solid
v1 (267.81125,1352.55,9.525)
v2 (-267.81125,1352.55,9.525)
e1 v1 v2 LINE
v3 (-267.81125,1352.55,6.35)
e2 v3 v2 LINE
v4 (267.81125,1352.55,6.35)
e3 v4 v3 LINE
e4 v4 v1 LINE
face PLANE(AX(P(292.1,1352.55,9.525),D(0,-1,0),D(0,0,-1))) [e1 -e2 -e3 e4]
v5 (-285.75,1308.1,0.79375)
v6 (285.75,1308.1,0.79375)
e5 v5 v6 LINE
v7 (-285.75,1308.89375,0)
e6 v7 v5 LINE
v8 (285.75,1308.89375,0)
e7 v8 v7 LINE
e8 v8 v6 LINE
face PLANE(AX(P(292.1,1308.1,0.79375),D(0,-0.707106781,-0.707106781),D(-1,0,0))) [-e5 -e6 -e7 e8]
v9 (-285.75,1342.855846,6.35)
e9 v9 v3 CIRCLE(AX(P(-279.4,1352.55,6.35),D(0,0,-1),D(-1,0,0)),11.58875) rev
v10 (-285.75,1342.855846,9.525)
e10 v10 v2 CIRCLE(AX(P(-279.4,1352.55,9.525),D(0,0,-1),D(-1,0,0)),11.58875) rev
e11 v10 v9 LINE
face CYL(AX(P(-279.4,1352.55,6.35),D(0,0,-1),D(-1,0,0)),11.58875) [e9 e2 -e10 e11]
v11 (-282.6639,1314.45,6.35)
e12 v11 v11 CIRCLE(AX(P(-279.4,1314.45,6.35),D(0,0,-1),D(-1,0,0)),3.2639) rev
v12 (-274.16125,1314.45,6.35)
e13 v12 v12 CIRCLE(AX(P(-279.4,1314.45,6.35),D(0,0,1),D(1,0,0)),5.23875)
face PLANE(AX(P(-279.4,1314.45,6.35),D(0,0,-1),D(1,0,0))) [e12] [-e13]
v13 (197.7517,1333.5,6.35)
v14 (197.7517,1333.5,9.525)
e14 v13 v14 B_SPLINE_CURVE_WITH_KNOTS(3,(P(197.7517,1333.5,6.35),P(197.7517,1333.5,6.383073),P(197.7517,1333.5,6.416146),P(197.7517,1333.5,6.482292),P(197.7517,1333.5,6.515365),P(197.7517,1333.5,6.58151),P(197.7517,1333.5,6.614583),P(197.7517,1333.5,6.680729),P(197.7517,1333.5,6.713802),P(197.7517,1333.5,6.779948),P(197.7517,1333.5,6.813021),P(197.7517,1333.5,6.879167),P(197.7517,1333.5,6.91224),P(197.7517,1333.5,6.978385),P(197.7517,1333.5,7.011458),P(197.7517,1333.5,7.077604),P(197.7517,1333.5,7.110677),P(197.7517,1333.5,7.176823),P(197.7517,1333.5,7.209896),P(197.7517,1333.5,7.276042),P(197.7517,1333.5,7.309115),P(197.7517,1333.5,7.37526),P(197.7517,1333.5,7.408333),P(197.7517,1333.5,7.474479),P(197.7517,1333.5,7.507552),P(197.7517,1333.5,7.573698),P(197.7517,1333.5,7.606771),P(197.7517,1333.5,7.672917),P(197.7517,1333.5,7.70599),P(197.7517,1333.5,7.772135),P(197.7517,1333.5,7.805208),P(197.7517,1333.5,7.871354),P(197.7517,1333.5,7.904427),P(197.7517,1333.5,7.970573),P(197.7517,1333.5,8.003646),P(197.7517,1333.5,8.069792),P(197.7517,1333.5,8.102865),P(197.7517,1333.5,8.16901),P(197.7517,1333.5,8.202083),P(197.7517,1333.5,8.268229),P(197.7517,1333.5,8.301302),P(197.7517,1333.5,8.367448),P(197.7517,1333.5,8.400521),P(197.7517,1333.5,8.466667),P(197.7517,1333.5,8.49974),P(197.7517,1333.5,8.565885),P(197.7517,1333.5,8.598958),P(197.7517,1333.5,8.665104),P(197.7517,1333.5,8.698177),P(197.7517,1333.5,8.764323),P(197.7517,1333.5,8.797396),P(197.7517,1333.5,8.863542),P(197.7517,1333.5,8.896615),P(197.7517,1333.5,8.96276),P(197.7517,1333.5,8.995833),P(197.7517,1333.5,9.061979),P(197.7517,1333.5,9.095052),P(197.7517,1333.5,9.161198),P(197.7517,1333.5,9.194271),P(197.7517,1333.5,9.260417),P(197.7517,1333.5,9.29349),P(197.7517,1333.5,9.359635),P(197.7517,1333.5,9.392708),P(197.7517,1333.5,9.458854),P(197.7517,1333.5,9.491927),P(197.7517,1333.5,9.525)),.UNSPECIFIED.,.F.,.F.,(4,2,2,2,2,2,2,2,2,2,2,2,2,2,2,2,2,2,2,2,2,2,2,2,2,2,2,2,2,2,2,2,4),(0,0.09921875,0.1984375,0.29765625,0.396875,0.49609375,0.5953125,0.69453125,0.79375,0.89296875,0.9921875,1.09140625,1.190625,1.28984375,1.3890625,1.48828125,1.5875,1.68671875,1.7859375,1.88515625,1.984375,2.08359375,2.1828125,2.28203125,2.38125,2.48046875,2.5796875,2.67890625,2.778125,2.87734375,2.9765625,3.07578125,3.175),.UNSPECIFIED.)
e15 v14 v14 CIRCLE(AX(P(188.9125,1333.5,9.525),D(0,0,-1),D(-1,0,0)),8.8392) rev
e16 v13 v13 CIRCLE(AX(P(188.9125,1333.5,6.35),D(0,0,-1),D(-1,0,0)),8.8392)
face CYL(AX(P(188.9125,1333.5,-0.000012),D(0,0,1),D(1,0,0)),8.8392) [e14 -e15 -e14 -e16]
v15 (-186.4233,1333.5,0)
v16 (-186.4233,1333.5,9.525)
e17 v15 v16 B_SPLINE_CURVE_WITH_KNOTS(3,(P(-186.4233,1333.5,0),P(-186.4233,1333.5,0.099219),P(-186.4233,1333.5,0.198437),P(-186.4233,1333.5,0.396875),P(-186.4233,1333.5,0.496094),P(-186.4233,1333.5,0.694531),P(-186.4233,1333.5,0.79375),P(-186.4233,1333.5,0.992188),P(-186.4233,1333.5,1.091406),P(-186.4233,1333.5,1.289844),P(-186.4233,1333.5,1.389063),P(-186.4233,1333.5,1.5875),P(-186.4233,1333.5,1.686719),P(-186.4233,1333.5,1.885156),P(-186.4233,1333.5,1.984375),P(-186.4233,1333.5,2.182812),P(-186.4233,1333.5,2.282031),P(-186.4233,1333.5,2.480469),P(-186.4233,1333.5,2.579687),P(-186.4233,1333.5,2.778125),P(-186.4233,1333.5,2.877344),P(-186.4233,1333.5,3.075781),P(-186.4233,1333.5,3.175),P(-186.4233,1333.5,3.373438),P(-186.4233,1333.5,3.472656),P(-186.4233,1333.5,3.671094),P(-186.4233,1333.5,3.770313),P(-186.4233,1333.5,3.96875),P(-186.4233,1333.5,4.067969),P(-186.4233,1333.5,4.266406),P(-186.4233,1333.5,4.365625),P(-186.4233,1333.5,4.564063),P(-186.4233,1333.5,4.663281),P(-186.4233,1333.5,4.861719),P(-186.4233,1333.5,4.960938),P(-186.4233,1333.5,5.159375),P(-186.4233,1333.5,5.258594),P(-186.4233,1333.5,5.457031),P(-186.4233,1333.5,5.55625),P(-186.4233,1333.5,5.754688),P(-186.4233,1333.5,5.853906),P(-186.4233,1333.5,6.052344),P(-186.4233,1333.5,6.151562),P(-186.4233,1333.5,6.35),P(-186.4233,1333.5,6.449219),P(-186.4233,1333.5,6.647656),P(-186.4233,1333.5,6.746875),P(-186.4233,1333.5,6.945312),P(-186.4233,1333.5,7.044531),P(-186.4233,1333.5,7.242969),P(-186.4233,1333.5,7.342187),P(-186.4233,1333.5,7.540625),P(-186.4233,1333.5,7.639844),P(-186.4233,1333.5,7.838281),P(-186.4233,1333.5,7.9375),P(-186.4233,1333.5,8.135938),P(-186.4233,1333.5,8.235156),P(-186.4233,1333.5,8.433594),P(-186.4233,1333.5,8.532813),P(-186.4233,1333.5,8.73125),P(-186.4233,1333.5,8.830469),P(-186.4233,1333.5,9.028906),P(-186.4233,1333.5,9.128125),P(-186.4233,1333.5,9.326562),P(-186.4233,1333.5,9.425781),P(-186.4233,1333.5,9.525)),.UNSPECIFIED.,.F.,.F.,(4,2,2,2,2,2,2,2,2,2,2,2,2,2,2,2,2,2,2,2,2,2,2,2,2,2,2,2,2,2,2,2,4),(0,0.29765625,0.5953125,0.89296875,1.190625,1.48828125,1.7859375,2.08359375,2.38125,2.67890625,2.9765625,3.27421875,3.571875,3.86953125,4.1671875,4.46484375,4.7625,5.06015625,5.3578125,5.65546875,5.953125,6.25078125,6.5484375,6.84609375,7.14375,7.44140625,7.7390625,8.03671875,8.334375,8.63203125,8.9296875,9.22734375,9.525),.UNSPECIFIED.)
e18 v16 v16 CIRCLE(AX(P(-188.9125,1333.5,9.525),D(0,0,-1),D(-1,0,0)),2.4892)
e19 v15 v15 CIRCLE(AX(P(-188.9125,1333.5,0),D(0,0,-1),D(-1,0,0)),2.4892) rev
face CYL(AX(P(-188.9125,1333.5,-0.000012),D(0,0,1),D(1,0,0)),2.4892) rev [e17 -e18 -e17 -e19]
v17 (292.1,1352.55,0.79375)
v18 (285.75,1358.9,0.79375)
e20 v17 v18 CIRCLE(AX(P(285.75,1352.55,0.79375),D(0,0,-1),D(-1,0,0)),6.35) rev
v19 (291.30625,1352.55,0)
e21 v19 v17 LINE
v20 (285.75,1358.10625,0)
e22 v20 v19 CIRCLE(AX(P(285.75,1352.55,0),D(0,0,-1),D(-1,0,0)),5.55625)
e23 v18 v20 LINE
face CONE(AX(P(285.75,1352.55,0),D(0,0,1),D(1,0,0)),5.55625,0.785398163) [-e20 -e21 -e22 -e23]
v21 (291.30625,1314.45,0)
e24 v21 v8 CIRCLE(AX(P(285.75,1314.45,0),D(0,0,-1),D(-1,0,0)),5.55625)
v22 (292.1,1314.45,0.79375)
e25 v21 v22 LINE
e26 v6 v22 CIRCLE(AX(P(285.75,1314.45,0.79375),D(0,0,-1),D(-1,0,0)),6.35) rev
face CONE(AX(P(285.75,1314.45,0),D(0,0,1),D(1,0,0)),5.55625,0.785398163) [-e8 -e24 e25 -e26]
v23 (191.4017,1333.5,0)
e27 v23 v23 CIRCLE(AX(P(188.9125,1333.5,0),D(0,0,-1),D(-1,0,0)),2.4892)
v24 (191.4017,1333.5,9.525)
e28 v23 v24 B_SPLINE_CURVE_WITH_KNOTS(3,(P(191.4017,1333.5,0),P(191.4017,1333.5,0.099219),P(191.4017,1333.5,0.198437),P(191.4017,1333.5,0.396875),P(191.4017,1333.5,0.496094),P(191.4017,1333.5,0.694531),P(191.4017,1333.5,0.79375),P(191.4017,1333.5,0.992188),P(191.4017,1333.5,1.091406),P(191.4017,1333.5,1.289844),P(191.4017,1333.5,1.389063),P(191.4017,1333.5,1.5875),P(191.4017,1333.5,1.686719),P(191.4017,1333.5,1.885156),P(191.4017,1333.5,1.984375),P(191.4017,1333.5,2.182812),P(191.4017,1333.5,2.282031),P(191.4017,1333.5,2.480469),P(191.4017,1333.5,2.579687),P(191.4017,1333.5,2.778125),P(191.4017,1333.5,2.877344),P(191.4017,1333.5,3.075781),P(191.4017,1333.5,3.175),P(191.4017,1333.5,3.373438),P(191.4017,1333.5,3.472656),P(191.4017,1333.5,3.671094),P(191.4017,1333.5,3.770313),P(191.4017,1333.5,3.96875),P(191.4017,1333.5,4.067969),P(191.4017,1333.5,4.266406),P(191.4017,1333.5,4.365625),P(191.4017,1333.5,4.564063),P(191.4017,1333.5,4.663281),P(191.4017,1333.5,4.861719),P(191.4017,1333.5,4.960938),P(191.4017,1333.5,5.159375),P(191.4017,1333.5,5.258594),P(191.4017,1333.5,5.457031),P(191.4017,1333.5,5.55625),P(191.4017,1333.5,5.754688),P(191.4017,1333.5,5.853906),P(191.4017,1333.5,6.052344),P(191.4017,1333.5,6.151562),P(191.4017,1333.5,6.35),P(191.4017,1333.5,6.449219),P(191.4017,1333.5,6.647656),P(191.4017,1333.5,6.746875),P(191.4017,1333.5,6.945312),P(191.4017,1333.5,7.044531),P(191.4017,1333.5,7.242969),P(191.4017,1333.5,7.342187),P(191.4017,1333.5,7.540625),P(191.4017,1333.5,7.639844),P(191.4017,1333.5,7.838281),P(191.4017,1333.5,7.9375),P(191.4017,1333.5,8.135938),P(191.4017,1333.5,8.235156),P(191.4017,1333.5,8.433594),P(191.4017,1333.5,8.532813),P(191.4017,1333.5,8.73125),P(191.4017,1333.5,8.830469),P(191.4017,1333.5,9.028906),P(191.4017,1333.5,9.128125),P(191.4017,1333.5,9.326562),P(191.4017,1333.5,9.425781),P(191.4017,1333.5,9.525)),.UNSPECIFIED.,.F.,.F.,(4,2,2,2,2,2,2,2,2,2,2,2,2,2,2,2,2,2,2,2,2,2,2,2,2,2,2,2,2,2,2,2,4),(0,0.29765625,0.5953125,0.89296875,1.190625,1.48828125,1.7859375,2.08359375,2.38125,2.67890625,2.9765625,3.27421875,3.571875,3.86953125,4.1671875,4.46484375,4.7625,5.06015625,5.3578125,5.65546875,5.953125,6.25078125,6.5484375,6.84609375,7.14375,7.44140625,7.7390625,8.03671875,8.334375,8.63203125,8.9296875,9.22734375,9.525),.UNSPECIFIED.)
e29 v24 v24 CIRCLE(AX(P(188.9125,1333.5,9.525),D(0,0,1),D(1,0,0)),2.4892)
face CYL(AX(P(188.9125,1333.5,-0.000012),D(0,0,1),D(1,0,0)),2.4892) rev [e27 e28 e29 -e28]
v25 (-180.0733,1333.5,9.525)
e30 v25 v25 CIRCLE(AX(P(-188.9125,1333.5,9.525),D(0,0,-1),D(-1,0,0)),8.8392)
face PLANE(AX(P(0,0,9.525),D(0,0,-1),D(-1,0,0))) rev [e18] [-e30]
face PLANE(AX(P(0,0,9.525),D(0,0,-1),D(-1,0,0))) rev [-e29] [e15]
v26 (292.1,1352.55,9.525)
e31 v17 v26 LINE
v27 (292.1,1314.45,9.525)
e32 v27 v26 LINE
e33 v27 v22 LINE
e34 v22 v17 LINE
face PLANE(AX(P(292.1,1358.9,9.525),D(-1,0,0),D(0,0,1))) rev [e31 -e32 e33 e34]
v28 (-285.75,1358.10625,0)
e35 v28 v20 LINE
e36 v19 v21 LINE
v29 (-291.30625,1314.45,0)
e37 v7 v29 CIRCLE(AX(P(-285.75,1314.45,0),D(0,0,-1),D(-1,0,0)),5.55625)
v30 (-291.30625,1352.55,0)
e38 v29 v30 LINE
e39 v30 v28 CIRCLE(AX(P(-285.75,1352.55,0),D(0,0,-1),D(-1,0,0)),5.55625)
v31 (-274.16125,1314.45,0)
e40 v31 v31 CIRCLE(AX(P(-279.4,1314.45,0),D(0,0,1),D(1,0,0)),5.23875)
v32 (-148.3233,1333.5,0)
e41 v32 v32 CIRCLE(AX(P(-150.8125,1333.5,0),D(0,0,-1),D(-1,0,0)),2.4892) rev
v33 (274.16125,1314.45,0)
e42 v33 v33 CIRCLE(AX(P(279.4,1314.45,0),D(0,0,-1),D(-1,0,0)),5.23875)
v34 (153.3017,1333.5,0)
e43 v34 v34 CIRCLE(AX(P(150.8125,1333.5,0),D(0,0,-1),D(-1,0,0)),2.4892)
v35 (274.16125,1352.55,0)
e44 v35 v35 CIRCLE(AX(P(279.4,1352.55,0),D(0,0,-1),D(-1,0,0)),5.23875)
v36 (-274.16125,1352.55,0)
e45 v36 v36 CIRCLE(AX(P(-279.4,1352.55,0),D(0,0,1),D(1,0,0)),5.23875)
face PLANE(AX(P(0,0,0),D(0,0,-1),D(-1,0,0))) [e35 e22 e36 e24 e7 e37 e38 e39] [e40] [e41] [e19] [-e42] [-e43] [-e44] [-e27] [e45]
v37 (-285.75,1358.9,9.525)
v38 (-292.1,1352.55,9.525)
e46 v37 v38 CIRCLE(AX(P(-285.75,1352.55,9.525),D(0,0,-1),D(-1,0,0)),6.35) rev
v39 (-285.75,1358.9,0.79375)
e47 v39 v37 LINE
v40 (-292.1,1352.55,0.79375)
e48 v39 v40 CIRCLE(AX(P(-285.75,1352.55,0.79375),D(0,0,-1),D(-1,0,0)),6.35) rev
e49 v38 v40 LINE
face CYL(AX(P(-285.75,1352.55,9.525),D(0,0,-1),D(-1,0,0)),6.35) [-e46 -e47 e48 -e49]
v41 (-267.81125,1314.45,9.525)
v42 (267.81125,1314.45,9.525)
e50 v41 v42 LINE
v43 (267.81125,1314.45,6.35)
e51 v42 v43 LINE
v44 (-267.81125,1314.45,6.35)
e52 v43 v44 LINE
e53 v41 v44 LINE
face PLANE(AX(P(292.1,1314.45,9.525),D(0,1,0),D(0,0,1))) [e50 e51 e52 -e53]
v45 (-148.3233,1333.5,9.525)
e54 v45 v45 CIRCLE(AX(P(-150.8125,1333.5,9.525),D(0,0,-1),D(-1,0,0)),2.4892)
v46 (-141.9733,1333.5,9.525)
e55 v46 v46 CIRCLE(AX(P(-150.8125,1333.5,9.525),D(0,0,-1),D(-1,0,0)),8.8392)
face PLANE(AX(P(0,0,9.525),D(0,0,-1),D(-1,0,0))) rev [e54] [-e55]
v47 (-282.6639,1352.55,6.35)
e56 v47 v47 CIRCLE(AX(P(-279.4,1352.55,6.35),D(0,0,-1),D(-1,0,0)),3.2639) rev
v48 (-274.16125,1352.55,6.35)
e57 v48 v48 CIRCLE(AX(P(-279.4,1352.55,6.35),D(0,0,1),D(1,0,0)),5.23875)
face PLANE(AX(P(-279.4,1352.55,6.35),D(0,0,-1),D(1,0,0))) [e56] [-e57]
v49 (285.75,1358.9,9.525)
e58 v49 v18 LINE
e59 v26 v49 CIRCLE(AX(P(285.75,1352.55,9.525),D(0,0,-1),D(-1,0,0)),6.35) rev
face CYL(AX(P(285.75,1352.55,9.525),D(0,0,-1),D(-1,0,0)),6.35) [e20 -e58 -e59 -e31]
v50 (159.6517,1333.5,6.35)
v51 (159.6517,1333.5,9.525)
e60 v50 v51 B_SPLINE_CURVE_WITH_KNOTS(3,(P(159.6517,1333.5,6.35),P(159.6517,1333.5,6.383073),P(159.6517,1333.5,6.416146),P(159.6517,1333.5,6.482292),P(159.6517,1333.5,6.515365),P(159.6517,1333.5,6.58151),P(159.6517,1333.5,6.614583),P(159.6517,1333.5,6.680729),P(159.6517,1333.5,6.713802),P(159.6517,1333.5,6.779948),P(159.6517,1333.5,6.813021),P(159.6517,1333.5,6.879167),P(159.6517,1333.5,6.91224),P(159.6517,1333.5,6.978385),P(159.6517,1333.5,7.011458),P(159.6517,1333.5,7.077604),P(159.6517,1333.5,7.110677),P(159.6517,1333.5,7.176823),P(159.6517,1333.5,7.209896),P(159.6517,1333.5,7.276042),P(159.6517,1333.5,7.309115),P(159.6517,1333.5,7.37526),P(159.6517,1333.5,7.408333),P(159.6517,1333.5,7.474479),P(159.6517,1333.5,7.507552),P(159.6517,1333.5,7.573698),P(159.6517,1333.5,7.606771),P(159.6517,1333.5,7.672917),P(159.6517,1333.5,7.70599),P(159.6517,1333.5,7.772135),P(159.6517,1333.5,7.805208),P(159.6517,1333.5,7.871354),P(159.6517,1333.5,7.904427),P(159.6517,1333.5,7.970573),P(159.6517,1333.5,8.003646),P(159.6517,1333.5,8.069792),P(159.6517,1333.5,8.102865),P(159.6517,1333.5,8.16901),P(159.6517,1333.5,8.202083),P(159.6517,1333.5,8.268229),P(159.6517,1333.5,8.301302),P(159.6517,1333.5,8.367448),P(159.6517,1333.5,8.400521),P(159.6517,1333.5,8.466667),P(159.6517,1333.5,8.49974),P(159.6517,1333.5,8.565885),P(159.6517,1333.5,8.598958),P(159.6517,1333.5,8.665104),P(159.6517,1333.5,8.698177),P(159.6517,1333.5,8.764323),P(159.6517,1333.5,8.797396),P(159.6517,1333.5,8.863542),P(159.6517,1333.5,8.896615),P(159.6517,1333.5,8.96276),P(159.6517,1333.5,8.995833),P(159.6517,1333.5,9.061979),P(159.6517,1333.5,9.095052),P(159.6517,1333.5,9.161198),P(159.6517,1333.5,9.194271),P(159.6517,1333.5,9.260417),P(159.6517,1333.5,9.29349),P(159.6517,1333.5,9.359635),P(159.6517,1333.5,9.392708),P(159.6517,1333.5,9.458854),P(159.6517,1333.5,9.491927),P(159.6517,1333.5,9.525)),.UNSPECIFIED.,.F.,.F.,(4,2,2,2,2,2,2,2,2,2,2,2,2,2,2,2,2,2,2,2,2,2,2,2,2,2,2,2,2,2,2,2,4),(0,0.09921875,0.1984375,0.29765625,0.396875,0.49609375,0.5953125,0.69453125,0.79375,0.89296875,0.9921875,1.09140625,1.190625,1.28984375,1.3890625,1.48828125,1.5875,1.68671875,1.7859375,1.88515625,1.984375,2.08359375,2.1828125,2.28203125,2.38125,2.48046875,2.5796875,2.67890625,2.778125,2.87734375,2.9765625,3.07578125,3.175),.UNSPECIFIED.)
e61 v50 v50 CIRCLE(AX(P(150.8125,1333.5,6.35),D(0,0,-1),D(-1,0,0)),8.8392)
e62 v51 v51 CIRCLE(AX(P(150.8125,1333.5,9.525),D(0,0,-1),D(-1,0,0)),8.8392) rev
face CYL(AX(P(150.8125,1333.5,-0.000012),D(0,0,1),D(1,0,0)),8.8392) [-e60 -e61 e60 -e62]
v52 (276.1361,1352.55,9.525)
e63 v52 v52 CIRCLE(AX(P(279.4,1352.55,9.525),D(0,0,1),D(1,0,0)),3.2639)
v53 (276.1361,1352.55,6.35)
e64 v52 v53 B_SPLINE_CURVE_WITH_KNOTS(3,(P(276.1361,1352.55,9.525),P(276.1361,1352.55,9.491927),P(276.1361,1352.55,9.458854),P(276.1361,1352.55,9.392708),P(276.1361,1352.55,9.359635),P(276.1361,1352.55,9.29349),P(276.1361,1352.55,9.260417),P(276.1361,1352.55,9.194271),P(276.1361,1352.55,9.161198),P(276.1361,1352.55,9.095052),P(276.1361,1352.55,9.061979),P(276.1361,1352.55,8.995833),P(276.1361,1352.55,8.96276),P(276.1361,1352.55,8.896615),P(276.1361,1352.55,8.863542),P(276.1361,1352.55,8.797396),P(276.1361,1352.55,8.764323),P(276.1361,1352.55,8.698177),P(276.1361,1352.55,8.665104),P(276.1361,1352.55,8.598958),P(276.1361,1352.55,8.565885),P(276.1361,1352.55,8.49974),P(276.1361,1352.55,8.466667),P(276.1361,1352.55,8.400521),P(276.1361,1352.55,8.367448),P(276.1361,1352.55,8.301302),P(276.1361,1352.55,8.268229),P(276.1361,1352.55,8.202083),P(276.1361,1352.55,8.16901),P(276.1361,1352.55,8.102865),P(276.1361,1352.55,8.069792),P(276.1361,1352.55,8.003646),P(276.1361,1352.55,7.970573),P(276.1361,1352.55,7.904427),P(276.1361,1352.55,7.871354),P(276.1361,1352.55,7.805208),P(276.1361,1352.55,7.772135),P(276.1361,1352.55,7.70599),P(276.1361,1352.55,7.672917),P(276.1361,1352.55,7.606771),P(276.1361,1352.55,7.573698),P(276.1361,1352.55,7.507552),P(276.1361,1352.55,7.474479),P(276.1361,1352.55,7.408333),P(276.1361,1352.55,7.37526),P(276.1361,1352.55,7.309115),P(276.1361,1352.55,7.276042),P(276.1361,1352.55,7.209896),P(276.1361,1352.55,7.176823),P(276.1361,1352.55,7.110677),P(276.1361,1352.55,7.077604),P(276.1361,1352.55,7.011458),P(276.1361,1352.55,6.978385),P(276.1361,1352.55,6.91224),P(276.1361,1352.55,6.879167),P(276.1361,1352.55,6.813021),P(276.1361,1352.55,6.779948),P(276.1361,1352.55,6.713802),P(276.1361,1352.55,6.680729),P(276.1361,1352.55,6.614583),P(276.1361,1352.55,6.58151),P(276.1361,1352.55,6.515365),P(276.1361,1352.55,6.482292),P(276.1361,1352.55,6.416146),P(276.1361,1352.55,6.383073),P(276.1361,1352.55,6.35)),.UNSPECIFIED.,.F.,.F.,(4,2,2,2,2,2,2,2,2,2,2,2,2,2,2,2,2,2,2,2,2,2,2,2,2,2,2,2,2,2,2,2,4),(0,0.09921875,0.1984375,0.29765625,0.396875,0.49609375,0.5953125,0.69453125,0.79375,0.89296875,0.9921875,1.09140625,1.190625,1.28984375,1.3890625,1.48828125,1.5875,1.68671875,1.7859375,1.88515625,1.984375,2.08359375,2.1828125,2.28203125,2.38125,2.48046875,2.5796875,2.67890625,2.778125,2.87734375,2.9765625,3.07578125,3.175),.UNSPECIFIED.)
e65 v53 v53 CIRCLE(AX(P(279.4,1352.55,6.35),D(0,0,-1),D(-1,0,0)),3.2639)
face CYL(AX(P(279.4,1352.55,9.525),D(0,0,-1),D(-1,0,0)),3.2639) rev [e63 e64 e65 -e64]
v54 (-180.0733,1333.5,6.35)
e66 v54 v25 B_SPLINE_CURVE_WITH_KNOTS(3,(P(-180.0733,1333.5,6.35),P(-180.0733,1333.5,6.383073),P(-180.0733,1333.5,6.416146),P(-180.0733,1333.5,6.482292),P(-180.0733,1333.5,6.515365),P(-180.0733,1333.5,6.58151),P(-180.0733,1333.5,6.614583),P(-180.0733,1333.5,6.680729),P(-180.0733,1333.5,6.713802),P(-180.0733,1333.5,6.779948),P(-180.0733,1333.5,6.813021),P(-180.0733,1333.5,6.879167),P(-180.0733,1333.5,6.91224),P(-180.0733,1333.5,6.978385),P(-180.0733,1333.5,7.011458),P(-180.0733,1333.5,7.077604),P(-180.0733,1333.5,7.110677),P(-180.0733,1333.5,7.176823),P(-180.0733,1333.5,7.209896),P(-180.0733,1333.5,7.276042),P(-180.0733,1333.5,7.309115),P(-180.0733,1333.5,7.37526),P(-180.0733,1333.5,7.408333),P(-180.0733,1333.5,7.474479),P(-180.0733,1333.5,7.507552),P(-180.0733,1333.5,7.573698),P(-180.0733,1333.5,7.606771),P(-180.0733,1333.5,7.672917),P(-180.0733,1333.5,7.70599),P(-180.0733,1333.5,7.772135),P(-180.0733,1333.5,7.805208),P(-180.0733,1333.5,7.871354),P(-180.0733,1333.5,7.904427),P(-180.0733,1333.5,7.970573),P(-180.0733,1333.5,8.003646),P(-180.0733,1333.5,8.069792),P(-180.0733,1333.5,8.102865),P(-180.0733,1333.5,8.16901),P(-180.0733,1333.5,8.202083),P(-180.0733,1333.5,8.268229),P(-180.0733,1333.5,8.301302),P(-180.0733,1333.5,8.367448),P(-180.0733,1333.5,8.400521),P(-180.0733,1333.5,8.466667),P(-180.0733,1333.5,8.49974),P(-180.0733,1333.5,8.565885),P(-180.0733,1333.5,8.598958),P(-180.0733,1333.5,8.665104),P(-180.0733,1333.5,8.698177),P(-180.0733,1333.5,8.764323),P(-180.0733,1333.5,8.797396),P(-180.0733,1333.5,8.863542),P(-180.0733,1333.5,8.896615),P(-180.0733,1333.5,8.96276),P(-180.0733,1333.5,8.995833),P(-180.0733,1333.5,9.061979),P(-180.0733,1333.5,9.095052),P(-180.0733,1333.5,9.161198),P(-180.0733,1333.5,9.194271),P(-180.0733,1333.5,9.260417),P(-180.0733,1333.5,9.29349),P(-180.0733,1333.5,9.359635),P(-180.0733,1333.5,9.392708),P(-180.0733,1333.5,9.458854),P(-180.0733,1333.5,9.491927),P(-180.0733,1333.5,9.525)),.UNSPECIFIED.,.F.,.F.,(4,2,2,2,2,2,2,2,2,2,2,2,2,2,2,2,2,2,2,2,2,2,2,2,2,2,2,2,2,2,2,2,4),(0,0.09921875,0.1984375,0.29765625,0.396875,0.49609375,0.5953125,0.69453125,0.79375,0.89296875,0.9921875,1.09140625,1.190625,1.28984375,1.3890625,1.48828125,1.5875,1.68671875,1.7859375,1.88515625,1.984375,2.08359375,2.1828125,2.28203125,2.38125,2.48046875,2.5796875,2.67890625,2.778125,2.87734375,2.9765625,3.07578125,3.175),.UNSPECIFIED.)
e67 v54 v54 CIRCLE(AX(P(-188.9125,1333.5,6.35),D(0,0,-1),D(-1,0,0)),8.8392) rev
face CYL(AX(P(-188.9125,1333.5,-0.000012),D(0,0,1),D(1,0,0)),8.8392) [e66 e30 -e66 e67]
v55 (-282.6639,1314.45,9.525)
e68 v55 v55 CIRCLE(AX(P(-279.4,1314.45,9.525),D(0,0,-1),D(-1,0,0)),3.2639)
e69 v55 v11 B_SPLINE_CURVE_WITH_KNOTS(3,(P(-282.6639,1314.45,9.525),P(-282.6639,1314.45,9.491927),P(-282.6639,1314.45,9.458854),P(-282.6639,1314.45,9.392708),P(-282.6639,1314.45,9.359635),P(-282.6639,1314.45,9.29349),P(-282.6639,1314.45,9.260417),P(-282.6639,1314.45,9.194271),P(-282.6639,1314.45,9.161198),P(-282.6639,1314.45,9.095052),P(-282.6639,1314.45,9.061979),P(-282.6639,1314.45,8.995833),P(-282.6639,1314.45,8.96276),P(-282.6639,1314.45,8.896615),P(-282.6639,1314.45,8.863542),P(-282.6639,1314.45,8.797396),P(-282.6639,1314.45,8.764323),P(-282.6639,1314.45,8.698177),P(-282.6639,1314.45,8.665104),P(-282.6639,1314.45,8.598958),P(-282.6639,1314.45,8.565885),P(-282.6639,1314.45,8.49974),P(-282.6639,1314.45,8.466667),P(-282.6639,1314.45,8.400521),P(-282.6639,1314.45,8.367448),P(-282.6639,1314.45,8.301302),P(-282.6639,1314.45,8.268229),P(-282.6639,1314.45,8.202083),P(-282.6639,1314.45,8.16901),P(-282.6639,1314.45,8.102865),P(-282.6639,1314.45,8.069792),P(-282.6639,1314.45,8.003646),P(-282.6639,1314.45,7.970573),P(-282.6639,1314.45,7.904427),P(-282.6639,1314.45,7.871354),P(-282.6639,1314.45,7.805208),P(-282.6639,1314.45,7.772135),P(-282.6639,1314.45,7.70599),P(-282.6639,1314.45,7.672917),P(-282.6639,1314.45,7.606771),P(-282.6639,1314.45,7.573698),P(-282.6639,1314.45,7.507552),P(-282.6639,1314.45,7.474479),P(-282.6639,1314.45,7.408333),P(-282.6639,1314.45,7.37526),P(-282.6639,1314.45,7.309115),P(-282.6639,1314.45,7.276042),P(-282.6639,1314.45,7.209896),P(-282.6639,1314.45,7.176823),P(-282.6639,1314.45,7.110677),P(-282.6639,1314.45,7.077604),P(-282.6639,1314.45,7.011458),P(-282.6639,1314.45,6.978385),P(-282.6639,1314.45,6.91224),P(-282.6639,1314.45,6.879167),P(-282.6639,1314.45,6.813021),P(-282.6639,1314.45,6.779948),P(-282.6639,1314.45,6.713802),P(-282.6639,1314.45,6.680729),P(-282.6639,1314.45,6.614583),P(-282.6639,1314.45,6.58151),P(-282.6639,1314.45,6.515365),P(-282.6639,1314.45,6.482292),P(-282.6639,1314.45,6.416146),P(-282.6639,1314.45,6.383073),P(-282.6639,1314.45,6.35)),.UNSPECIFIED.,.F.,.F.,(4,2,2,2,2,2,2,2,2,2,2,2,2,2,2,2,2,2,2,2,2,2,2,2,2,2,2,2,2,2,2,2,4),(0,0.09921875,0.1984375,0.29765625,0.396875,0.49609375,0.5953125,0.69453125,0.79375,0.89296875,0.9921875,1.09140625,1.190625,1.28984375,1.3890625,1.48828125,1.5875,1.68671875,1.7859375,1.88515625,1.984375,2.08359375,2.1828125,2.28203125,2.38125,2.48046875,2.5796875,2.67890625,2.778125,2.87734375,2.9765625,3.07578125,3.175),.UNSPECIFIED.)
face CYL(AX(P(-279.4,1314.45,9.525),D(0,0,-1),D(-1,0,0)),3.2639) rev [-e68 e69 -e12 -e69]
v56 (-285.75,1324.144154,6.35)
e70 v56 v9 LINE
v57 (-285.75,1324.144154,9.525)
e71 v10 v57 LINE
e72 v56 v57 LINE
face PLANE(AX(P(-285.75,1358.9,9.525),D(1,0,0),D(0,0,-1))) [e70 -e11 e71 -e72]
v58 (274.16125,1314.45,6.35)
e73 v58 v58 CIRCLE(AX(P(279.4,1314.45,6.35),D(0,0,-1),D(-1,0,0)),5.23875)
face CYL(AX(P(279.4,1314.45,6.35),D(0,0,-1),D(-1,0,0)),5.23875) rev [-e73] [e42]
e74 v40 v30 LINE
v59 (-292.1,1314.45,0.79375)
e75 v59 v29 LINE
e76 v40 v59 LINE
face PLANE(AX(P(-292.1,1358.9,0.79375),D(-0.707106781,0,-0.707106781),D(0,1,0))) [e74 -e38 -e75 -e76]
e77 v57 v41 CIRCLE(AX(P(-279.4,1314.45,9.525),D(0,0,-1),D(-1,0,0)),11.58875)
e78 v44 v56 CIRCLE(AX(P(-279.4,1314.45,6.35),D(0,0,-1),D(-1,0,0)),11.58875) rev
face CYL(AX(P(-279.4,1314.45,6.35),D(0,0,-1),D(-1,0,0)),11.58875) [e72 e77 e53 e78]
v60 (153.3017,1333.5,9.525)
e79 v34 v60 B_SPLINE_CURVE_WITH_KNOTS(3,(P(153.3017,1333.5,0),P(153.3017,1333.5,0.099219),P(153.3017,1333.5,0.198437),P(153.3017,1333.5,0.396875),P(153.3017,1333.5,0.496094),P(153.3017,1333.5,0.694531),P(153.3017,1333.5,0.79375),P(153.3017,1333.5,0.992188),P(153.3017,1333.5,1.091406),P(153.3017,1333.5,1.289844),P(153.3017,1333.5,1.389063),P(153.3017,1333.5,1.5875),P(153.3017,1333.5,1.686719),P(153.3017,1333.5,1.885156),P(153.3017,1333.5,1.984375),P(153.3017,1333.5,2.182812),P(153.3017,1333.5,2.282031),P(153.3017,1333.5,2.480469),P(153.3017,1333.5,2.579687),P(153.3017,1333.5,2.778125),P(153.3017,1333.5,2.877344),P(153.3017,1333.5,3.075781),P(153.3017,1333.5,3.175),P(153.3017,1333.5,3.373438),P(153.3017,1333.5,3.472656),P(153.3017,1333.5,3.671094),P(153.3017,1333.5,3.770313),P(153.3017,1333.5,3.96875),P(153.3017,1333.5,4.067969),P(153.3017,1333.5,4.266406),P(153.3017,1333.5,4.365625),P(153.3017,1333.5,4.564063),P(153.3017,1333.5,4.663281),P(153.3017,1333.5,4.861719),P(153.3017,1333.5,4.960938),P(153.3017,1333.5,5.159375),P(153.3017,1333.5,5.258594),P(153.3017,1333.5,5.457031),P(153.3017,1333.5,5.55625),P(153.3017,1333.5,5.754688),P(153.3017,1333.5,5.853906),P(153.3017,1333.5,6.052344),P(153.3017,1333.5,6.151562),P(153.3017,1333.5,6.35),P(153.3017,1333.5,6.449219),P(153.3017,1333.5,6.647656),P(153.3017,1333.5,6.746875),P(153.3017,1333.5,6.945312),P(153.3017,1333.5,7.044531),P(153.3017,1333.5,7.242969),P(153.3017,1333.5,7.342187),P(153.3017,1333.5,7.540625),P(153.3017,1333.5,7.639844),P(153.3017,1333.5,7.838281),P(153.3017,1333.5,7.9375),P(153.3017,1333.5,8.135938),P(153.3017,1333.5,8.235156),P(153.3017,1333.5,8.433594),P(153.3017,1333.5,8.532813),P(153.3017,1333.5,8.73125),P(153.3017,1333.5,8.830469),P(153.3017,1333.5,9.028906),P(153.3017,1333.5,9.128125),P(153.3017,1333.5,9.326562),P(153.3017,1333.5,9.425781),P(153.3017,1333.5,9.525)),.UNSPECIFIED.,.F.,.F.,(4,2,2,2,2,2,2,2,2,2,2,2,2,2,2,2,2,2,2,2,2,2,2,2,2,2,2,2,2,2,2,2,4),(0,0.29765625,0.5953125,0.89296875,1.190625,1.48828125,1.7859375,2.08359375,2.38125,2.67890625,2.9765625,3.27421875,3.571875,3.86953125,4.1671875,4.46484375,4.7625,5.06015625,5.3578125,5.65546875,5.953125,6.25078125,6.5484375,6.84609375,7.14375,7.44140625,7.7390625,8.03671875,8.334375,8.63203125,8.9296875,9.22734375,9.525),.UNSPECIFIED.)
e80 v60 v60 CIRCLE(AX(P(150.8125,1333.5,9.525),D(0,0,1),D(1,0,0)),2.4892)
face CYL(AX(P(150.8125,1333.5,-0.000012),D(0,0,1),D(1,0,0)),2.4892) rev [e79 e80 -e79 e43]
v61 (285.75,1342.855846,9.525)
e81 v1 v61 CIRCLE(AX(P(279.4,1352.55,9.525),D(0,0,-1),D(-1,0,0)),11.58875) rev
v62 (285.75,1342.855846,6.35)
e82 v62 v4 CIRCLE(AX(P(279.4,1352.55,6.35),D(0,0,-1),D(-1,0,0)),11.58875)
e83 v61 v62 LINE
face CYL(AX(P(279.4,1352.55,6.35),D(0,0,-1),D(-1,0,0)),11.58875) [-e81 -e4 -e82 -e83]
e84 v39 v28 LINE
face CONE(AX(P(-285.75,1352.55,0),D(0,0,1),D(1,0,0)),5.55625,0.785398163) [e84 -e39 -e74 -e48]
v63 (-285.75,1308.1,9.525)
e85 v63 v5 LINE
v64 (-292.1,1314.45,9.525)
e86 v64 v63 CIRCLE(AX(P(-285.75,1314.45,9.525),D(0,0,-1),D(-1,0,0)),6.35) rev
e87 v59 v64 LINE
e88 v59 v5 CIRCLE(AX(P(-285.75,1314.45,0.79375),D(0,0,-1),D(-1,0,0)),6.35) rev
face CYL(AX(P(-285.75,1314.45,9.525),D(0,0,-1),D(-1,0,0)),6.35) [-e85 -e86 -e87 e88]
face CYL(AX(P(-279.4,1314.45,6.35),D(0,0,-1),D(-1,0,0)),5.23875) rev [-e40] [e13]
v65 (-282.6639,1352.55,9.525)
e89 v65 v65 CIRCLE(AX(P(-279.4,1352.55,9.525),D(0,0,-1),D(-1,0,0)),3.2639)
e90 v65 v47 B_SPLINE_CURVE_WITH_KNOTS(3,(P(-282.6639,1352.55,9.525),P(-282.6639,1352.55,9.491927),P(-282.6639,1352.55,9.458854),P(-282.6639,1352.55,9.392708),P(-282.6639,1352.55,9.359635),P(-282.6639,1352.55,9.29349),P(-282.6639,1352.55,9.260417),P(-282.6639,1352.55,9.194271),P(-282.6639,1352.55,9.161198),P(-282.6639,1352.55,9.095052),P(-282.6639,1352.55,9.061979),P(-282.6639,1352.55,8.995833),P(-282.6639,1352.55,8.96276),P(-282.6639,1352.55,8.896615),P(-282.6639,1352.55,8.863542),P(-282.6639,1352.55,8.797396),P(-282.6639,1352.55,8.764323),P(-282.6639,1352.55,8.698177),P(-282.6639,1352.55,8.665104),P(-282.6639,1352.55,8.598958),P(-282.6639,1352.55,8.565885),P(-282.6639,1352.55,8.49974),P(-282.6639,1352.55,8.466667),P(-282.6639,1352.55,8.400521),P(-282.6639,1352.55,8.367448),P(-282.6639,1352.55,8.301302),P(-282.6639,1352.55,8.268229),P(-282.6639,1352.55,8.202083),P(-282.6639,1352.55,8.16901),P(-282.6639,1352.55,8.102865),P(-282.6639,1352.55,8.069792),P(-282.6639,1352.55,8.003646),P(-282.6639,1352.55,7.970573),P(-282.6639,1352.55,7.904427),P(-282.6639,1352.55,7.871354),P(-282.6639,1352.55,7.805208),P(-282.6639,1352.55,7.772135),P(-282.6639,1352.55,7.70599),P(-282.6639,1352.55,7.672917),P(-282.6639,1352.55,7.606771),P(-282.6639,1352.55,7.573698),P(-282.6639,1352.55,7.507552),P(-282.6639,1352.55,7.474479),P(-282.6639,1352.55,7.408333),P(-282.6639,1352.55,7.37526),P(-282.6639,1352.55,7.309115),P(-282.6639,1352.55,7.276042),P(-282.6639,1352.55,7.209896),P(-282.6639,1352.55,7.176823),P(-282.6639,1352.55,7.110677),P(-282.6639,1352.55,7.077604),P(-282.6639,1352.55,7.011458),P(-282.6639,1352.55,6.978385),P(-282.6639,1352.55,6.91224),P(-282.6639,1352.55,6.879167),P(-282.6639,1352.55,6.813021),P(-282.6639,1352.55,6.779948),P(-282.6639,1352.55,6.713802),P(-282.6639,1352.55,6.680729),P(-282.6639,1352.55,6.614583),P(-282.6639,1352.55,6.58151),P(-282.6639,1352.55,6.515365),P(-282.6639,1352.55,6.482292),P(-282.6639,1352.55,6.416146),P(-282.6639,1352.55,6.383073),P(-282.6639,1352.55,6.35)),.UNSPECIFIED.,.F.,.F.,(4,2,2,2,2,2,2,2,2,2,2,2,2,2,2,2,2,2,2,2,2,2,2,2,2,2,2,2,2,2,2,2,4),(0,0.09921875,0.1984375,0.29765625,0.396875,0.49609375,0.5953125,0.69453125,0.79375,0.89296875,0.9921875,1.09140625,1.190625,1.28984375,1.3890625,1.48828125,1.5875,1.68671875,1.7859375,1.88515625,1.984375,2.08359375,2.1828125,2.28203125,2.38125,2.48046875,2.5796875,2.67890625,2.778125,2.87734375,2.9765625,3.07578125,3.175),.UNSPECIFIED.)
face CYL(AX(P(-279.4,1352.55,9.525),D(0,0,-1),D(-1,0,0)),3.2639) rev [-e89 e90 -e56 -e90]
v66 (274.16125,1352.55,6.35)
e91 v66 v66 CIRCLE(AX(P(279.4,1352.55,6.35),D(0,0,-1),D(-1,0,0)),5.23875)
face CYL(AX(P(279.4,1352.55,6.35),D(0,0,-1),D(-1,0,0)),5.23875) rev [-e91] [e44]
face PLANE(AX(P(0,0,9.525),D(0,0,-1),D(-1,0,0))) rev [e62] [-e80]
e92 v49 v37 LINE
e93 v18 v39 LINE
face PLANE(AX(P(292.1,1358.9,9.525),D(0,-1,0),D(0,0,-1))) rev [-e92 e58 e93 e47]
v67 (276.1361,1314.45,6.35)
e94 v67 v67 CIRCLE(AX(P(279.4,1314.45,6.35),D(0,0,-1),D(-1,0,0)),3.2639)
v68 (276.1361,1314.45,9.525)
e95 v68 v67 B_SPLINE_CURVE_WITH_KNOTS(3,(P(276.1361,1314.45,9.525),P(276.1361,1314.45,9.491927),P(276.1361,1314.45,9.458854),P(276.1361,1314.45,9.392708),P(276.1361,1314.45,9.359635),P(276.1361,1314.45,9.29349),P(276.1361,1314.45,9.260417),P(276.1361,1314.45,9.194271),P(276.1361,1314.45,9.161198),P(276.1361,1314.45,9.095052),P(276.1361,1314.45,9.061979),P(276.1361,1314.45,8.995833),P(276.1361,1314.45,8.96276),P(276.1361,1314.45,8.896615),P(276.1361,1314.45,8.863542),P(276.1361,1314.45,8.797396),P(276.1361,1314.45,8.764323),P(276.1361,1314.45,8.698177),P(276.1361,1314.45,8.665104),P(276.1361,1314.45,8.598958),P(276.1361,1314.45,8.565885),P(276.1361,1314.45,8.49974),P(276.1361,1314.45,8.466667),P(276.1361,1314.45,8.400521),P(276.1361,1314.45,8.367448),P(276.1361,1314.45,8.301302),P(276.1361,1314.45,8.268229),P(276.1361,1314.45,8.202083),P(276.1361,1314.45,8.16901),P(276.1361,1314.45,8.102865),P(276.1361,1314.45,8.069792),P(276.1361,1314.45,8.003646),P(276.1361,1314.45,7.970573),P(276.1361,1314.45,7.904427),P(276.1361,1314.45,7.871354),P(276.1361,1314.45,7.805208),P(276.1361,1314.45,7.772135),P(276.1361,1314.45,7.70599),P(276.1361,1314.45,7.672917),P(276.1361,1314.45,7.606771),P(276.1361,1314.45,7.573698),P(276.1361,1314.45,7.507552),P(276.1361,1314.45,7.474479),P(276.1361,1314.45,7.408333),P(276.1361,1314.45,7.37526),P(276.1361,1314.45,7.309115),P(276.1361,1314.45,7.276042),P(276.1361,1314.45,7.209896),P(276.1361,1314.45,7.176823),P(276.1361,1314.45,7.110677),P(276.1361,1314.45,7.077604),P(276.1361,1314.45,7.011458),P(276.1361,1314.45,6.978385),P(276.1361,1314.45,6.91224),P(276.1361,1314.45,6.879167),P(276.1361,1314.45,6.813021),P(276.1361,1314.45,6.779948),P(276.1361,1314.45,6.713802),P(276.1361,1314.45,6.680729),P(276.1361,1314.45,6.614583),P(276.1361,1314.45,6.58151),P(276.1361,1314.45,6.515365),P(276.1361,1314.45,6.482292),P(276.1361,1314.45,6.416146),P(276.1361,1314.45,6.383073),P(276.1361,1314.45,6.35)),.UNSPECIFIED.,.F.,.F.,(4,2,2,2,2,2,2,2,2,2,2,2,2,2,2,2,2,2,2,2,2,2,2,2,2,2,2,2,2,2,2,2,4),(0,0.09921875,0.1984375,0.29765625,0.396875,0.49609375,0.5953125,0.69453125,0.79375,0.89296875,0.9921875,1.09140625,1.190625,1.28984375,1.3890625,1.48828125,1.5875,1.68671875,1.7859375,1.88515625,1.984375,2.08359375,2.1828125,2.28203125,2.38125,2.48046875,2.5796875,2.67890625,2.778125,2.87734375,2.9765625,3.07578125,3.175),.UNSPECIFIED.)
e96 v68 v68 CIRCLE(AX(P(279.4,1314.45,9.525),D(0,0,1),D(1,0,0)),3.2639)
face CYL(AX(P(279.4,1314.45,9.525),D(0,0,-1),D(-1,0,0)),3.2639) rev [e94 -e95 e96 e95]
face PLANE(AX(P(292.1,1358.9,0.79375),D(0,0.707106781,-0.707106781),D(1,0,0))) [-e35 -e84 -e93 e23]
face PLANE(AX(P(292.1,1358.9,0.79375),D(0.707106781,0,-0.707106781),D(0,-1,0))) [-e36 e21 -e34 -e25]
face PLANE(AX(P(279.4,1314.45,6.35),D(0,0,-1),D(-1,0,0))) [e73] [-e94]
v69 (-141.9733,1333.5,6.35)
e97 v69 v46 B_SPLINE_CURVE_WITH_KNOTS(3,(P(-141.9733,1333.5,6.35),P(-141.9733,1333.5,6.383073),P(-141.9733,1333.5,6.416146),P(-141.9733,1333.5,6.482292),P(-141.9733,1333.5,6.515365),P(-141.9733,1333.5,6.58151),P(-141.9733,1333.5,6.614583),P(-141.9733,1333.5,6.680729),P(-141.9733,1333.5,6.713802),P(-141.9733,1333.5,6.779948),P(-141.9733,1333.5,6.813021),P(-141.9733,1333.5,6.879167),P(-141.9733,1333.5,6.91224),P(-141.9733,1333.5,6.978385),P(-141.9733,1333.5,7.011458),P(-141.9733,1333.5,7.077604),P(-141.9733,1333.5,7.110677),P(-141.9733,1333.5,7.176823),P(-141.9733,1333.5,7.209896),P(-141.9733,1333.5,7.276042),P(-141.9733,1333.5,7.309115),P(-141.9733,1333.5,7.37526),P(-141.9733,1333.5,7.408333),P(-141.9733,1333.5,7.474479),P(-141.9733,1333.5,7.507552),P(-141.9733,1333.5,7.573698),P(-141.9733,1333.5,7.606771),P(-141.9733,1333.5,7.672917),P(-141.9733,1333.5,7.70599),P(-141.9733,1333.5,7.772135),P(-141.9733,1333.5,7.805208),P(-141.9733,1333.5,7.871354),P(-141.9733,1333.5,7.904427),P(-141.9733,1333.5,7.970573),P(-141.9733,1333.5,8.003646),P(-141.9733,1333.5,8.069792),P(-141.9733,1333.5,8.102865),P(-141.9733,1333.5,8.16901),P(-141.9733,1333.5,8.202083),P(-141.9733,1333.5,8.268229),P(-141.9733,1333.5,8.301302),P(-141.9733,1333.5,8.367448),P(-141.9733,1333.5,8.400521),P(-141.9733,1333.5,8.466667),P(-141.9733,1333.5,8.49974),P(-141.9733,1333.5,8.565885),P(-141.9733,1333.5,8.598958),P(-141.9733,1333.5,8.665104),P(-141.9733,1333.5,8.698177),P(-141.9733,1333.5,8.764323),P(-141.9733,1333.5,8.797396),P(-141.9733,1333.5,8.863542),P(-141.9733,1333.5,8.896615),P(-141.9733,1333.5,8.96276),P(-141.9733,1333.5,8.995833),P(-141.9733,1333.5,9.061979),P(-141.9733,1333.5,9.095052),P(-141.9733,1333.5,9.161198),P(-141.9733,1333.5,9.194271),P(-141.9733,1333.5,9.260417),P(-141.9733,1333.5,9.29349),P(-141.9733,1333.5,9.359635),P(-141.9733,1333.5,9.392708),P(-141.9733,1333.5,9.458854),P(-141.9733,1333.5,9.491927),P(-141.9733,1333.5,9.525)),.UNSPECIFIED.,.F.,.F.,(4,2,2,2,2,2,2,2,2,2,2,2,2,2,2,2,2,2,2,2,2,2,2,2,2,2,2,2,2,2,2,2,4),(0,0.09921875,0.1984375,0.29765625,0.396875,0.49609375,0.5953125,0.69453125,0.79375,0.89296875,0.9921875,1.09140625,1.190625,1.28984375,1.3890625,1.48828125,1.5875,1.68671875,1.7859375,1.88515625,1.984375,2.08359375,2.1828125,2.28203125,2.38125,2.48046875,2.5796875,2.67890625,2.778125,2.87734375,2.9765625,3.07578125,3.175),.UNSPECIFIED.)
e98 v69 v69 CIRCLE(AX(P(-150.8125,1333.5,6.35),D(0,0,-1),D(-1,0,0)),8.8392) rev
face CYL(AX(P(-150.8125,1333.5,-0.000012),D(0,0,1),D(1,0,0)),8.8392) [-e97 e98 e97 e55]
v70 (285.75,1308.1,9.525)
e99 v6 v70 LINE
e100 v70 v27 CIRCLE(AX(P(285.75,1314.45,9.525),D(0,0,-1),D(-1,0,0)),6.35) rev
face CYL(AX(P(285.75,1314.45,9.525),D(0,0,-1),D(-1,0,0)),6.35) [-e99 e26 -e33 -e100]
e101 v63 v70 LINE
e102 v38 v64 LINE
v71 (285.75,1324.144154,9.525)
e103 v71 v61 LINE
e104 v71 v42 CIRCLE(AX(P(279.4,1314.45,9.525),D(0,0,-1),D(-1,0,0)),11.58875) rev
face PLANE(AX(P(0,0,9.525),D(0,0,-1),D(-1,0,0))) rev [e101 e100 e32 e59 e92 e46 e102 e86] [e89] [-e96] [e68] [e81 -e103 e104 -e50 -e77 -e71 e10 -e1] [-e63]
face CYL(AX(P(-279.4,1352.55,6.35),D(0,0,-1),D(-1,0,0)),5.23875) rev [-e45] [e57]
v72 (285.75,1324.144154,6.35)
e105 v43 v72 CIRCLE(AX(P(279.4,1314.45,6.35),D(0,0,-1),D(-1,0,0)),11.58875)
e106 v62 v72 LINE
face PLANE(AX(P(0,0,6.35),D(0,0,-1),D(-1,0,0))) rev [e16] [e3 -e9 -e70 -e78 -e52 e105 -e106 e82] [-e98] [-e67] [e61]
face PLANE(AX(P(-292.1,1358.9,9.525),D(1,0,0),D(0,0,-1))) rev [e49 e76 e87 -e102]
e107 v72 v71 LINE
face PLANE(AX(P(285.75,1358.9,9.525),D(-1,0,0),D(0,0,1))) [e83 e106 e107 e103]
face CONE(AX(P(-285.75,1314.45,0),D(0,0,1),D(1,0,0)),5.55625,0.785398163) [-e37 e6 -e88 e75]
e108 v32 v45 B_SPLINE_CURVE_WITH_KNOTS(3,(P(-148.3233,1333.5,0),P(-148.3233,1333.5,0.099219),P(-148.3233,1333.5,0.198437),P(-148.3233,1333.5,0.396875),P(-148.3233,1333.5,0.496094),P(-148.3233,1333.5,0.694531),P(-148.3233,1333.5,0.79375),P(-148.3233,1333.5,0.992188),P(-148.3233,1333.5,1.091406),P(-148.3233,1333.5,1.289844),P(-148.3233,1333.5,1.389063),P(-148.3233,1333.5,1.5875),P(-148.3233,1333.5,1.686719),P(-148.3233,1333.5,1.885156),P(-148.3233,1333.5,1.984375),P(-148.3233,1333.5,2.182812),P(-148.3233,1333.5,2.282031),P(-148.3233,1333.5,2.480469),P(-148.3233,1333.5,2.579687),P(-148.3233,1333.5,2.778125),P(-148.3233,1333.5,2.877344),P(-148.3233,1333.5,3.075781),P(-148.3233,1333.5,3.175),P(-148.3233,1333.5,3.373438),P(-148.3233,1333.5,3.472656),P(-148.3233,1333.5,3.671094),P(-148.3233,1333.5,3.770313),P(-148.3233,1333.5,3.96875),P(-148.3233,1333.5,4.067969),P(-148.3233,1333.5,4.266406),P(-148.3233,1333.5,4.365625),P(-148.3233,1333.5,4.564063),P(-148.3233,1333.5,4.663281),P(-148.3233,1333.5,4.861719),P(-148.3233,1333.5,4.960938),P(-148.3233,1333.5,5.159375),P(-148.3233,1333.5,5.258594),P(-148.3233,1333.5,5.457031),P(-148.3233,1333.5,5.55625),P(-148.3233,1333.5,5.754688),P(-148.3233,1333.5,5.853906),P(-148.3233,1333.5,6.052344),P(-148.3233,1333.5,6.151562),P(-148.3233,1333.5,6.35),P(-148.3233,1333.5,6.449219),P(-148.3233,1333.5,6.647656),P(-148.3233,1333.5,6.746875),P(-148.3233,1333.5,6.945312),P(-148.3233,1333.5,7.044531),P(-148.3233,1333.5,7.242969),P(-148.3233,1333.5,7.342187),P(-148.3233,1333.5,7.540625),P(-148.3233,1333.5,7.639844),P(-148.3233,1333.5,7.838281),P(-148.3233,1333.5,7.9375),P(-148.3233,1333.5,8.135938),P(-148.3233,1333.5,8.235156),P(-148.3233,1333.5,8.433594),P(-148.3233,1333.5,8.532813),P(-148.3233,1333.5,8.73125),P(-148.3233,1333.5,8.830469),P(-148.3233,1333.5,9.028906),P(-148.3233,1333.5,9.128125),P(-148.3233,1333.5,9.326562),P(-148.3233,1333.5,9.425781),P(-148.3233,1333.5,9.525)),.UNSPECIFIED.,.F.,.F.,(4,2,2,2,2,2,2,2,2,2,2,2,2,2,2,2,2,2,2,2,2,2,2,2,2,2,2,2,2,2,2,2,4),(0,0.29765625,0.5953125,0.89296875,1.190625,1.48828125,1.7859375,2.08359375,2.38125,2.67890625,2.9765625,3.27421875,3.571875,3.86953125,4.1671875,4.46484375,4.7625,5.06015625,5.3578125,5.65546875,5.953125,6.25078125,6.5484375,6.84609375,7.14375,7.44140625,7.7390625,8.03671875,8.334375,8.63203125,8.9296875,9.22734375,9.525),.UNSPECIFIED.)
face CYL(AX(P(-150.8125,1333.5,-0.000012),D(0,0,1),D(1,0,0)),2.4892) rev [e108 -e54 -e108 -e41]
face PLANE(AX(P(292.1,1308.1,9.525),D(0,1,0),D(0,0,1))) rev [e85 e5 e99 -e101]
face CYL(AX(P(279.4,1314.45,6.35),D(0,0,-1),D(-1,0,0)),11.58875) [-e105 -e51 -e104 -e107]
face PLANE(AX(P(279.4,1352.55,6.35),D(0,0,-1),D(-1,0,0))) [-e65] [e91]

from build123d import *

# Parameters (mm, degrees)
SKETCH1_W           = 584.2
SKETCH1_H           = 50.8
BOSS_EXTRUDE1_DEPTH = 9.525
SKETCH2_R           = 3.2639
CUT_EXTRUDE2_DEPTH  = 1390.972066491
SKETCH3_R           = 5.23875
CUT_EXTRUDE3_DEPTH  = 6.35
FILLET1_R           = 6.35
SKETCH4_R           = 2.4892
CUT_EXTRUDE4_DEPTH  = 1390.972066491
CHAMFER1_SIZE       = 0.79375
SHELL1_START        = 6.35
SHELL1_OUTLINE_R    = 8.8392
SHELL1_DEPTH        = 3.175


# Read off the part's stored shape, not the designer's step: Shell1
with BuildPart() as part:
    # Sketch1 → Boss-Extrude1 (new body)
    with BuildSketch(Plane.XY):
        with Locations((0, 1333.5)):
            Rectangle(SKETCH1_W, SKETCH1_H)
    extrude(amount=BOSS_EXTRUDE1_DEPTH)

    # Sketch2 → Cut-Extrude2 (cut, through all)
    with BuildSketch(Plane.XY):
        with Locations(Location((279.4, 1314.45, 0), (0, 0, 180))):
            Circle(SKETCH2_R)
        with Locations(Location((279.4, 1352.55, 0), (0, 0, 180))):
            Circle(SKETCH2_R)
    cut_extrude2 = extrude(amount=CUT_EXTRUDE2_DEPTH, mode=Mode.SUBTRACT)

    # Sketch3 → Cut-Extrude3 (cut)
    with BuildSketch(Plane(origin=(0, 0, 0), x_dir=(-1, 0, 0), z_dir=(0, 0, -1))):
        with Locations((-279.4, 1314.45)):
            Circle(SKETCH3_R)
        with Locations((-279.4, 1352.55)):
            Circle(SKETCH3_R)
    cut_extrude3 = extrude(amount=-CUT_EXTRUDE3_DEPTH, mode=Mode.SUBTRACT)

    # Fillet1
    fillet1_edges = [part.edges().sort_by_distance(p)[0] for p in [
        (292.1, 1308.1, 4.7625),
        (-292.1, 1308.1, 4.7625),
        (-292.1, 1358.9, 4.7625),
        (292.1, 1358.9, 4.7625),
    ]]
    fillet(fillet1_edges, radius=FILLET1_R)

    # Sketch4 → Cut-Extrude4 (cut, symmetric)
    with BuildSketch(Plane.XY):
        with Locations((150.8125, 1333.5)):
            Circle(SKETCH4_R)
        with Locations((188.9125, 1333.5)):
            Circle(SKETCH4_R)
    cut_extrude4 = extrude(amount=CUT_EXTRUDE4_DEPTH, both=True, mode=Mode.SUBTRACT)

    # Mirror2: Cut-Extrude2, Cut-Extrude3, Cut-Extrude4 across plane
    add(cut_extrude2.mirror(Plane(origin=(0, 0, 0), x_dir=(0, 0, 1), z_dir=(1, 0, 0))), mode=Mode.SUBTRACT)
    add(cut_extrude3.mirror(Plane(origin=(0, 0, 0), x_dir=(0, 0, 1), z_dir=(1, 0, 0))), mode=Mode.SUBTRACT)
    add(cut_extrude4.mirror(Plane(origin=(0, 0, 0), x_dir=(0, 0, 1), z_dir=(1, 0, 0))), mode=Mode.SUBTRACT)

    # Chamfer1
    chamfer1_edges = [part.edges().sort_by_distance(p)[0] for p in [
        (0, 1308.1, 0),
        (292.1, 1333.5, 0),
        (-292.1, 1333.5, 0),
        (0, 1358.9, 0),
        (290.240128061, 1357.040128061, 0),
        (290.240128061, 1309.959871939, 0),
        (-290.240128061, 1357.040128061, 0),
        (-290.240128061, 1309.959871939, 0),
    ]]
    chamfer(chamfer1_edges, length=CHAMFER1_SIZE)

    # Shell1 outline → Shell1 (cut)
    with BuildSketch(Plane.XY.offset(SHELL1_START)):
        with BuildLine():
            Line((285.75, 1324.144154247), (285.75, 1342.855845753))
            ThreePointArc((285.75, 1342.855845753), (273.89043722, 1342.354714593), (267.81125, 1352.55))
            Line((267.81125, 1352.55), (-267.81125, 1352.55))
            ThreePointArc((-267.81125, 1352.55), (-273.89043722, 1342.354714593), (-285.75, 1342.855845753))
            Line((-285.75, 1342.855845753), (-285.75, 1324.144154247))
            ThreePointArc((-285.75, 1324.144154247), (-273.89043722, 1324.645285407), (-267.81125, 1314.45))
            Line((-267.81125, 1314.45), (267.81125, 1314.45))
            ThreePointArc((267.81125, 1314.45), (273.89043722, 1324.645285407), (285.75, 1324.144154247))
        make_face()
        with Locations((-188.9125, 1333.5)):
            Circle(SHELL1_OUTLINE_R, mode=Mode.SUBTRACT)
        with Locations((-150.8125, 1333.5)):
            Circle(SHELL1_OUTLINE_R, mode=Mode.SUBTRACT)
        with Locations((150.8125, 1333.5)):
            Circle(SHELL1_OUTLINE_R, mode=Mode.SUBTRACT)
        with Locations((188.9125, 1333.5)):
            Circle(SHELL1_OUTLINE_R, mode=Mode.SUBTRACT)
    extrude(amount=SHELL1_DEPTH, mode=Mode.SUBTRACT)


solid = part.part
